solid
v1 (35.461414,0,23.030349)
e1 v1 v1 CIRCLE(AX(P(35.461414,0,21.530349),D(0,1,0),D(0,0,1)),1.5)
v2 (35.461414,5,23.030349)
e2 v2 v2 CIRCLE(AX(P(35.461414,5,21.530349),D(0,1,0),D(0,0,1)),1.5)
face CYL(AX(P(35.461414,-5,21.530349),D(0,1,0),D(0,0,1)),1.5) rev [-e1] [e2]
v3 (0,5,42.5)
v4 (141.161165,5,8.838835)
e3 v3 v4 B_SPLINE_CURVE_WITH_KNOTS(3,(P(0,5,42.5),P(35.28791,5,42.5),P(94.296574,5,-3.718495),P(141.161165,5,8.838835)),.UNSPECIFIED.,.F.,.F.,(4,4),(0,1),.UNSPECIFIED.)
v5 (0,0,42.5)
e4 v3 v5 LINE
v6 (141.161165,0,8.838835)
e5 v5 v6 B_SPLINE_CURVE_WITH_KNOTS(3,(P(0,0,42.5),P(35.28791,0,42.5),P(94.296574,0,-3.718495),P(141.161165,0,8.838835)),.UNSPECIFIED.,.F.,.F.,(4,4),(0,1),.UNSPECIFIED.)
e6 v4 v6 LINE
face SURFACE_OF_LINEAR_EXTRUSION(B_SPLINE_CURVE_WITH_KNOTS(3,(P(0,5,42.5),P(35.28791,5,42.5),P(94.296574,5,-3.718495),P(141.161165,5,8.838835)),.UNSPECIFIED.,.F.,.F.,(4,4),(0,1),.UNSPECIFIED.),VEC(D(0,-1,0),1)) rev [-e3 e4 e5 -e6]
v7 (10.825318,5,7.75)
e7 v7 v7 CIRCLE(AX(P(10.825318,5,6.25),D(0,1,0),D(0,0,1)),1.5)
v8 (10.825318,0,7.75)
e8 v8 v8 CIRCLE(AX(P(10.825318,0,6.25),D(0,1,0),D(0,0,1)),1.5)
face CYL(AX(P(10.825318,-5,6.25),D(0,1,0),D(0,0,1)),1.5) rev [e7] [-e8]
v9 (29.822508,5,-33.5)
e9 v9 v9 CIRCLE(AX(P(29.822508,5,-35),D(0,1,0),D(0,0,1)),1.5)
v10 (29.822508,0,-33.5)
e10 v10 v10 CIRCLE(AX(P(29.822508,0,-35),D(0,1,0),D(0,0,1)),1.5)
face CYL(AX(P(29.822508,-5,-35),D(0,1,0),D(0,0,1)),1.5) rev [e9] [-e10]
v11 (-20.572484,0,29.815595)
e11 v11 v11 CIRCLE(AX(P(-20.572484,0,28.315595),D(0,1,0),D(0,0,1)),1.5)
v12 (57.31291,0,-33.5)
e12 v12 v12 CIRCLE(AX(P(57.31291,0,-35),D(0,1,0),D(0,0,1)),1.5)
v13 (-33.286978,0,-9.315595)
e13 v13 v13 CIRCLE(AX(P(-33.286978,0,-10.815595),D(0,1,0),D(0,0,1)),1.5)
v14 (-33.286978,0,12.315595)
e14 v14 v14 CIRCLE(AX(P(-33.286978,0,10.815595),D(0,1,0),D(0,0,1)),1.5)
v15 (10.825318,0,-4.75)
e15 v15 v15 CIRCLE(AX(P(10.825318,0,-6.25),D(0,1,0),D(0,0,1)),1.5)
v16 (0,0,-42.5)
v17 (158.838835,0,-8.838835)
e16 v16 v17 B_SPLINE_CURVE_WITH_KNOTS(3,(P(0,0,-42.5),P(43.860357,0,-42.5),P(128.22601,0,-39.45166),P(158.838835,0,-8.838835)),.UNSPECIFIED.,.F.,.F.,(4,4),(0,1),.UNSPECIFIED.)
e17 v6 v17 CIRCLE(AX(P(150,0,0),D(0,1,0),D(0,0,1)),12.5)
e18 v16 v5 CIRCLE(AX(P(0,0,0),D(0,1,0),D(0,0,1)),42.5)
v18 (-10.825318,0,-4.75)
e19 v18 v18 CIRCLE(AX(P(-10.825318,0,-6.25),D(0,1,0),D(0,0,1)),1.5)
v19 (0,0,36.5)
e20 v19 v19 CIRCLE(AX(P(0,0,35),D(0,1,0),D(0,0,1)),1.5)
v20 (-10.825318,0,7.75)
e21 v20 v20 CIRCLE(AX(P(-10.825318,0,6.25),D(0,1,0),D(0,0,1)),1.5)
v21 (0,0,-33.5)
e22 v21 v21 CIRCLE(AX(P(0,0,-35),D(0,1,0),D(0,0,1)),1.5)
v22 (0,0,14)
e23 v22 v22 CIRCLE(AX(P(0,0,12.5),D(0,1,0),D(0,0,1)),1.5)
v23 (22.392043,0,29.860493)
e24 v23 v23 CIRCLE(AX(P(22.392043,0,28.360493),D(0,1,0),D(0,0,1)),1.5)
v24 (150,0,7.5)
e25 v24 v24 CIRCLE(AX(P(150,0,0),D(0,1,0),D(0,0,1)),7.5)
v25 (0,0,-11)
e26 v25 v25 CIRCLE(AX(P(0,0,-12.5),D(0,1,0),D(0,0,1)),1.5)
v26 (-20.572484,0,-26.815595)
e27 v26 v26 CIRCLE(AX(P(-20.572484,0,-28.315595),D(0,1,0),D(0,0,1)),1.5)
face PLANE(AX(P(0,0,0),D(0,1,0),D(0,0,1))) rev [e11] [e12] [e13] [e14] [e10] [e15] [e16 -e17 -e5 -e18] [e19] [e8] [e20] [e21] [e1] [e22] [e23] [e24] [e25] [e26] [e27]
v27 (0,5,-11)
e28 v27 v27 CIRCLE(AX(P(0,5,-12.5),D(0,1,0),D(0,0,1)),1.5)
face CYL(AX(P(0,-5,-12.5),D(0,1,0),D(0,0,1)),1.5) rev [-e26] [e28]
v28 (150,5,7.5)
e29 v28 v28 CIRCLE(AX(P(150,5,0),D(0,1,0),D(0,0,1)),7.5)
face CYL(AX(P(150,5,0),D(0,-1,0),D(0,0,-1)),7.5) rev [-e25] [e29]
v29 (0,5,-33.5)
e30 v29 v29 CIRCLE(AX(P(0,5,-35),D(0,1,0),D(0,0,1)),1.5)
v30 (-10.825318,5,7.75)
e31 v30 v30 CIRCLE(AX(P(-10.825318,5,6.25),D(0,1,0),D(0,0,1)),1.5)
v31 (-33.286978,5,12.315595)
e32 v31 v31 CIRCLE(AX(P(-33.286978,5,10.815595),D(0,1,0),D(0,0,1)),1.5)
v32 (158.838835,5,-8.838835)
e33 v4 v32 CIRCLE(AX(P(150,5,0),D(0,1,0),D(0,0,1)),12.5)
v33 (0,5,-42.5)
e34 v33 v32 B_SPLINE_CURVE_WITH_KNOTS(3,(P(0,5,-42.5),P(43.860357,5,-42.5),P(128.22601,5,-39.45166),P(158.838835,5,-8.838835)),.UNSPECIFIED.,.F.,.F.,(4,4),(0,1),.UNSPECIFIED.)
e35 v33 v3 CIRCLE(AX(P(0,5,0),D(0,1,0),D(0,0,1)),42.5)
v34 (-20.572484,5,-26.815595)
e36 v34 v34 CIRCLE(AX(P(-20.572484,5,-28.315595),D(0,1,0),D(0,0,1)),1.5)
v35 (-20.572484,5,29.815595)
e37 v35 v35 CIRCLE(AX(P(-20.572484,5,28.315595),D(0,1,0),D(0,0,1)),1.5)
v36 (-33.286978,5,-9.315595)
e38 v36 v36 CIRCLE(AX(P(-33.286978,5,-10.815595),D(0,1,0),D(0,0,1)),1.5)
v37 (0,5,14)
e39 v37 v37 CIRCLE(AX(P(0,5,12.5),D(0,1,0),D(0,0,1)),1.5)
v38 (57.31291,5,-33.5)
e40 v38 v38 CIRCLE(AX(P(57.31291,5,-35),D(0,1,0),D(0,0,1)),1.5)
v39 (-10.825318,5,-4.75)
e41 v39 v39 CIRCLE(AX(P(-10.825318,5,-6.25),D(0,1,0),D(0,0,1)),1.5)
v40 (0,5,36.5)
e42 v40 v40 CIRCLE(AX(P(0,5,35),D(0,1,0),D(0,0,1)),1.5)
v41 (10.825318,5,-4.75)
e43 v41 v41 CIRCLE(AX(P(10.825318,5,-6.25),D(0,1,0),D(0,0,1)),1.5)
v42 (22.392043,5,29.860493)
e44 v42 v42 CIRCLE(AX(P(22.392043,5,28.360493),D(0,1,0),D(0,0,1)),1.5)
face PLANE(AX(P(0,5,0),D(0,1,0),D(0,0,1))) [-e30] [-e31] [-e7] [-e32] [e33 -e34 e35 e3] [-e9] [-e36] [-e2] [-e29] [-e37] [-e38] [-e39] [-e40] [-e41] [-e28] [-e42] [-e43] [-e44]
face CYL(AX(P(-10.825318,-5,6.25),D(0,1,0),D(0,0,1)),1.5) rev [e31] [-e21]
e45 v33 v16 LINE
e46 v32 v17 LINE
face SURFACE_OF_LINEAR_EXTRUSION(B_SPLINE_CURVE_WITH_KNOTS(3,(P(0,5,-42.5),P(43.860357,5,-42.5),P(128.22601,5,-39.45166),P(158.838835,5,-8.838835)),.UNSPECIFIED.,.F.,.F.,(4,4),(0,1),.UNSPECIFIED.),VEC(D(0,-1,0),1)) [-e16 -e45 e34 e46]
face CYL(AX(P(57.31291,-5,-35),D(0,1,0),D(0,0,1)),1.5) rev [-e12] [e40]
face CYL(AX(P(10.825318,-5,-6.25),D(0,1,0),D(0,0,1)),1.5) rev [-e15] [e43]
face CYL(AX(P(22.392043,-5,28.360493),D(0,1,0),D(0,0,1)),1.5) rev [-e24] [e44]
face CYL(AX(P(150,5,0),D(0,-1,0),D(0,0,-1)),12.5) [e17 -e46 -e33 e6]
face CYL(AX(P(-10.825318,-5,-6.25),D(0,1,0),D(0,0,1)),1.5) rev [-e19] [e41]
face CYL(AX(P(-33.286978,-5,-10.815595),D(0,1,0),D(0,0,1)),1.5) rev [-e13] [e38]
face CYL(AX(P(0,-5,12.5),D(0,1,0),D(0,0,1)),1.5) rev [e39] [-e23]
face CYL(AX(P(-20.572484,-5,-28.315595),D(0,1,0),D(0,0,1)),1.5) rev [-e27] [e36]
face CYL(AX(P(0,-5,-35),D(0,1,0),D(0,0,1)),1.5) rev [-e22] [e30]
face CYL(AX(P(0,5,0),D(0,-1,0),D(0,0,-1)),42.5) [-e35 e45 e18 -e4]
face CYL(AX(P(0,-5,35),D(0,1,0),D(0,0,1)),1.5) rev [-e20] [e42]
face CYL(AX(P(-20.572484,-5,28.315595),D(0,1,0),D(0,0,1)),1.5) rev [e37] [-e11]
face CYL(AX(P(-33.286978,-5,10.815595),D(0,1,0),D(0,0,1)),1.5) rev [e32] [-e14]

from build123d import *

# Parameters (mm, degrees)
BOSS_EXTRUDE3_OUTLINE_R = 7.5
BOSS_EXTRUDE3_DEPTH     = 5
SKETCH2_R               = 1.5
CUT_EXTRUDE1_DEPTH      = 10
SKETCH3_R               = 1.5
CUT_EXTRUDE2_DEPTH      = 10
SKETCH4_R               = 1.5
CUT_EXTRUDE3_DEPTH      = 10


# Read off the part's stored shape, not the designer's step: Boss-Extrude3
with BuildPart() as part:
    # Boss-Extrude3 outline → Boss-Extrude3 (new body)
    with BuildSketch(Plane(origin=(0, 0, 0), x_dir=(1, 0, 0), z_dir=(0, 1, 0))):
        with BuildLine():
            ThreePointArc((0, 42.5), (-42.5, 0), (0, -42.5))
            add(Edge.make_bspline(
                [(0, -42.5), (35.287909835, -42.5), (94.296573589, 3.71849472), (141.161165235, -8.838834765)],
                knots=[0, 0, 0, 0, 1, 1, 1, 1], degree=3))
            ThreePointArc((141.161165235, -8.838834765), (158.838834765, -8.838834765), (158.838834765, 8.838834765))
            add(Edge.make_bspline(
                [(0, 42.5), (43.860357416, 42.5), (128.226009794, 39.451659736), (158.838834765, 8.838834765)],
                knots=[0, 0, 0, 0, 1, 1, 1, 1], degree=3))
        make_face()
        with Locations((150, 0)):
            Circle(BOSS_EXTRUDE3_OUTLINE_R, mode=Mode.SUBTRACT)
    extrude(amount=BOSS_EXTRUDE3_DEPTH)

    # Sketch2 → Cut-Extrude1 (cut)
    with BuildSketch(Plane(origin=(0, 5, 0), x_dir=(1, 0, 0), z_dir=(0, 1, 0))):
        with Locations(Location((0, 35, 0), (0, 0, 270))):
            Circle(SKETCH2_R)
        with Locations(Location((0, 12.5, 0), (0, 0, 270))):
            Circle(SKETCH2_R)
        with Locations(Location((10.825317547, 6.25, 0), (0, 0, 270))):
            Circle(SKETCH2_R)
        with Locations(Location((10.825317547, -6.25, 0), (0, 0, 270))):
            Circle(SKETCH2_R)
        with Locations(Location((0, -12.5, 0), (0, 0, 270))):
            Circle(SKETCH2_R)
        with Locations(Location((-10.825317547, -6.25, 0), (0, 0, 270))):
            Circle(SKETCH2_R)
        with Locations(Location((-10.825317547, 6.25, 0), (0, 0, 270))):
            Circle(SKETCH2_R)
        with Locations(Location((-20.57248383, 28.315594803, 0), (0, 0, 270))):
            Circle(SKETCH2_R)
        with Locations(Location((-33.28697807, 10.815594803, 0), (0, 0, 270))):
            Circle(SKETCH2_R)
        with Locations(Location((-33.28697807, -10.815594803, 0), (0, 0, 270))):
            Circle(SKETCH2_R)
        with Locations(Location((-20.57248383, -28.315594803, 0), (0, 0, 270))):
            Circle(SKETCH2_R)
        with Locations(Location((0, -35, 0), (0, 0, 270))):
            Circle(SKETCH2_R)
    extrude(amount=-CUT_EXTRUDE1_DEPTH, mode=Mode.SUBTRACT)

    # Sketch3 → Cut-Extrude2 (cut)
    with BuildSketch(Plane(origin=(0, 5, 0), x_dir=(1, 0, 0), z_dir=(0, 1, 0))):
        with Locations(Location((29.822508304, 35, 0), (0, 0, 270))):
            Circle(SKETCH3_R)
        with Locations(Location((57.312909887, 35, 0), (0, 0, 270))):
            Circle(SKETCH3_R)
    extrude(amount=-CUT_EXTRUDE2_DEPTH, mode=Mode.SUBTRACT)

    # Sketch4 → Cut-Extrude3 (cut)
    with BuildSketch(Plane(origin=(0, 5, 0), x_dir=(1, 0, 0), z_dir=(0, 1, 0))):
        with Locations(Location((35.461413578, -21.530349116, 0), (0, 0, 270))):
            Circle(SKETCH4_R)
        with Locations(Location((22.392043347, -28.36049342, 0), (0, 0, 270))):
            Circle(SKETCH4_R)
    extrude(amount=-CUT_EXTRUDE3_DEPTH, mode=Mode.SUBTRACT)


solid = part.part
